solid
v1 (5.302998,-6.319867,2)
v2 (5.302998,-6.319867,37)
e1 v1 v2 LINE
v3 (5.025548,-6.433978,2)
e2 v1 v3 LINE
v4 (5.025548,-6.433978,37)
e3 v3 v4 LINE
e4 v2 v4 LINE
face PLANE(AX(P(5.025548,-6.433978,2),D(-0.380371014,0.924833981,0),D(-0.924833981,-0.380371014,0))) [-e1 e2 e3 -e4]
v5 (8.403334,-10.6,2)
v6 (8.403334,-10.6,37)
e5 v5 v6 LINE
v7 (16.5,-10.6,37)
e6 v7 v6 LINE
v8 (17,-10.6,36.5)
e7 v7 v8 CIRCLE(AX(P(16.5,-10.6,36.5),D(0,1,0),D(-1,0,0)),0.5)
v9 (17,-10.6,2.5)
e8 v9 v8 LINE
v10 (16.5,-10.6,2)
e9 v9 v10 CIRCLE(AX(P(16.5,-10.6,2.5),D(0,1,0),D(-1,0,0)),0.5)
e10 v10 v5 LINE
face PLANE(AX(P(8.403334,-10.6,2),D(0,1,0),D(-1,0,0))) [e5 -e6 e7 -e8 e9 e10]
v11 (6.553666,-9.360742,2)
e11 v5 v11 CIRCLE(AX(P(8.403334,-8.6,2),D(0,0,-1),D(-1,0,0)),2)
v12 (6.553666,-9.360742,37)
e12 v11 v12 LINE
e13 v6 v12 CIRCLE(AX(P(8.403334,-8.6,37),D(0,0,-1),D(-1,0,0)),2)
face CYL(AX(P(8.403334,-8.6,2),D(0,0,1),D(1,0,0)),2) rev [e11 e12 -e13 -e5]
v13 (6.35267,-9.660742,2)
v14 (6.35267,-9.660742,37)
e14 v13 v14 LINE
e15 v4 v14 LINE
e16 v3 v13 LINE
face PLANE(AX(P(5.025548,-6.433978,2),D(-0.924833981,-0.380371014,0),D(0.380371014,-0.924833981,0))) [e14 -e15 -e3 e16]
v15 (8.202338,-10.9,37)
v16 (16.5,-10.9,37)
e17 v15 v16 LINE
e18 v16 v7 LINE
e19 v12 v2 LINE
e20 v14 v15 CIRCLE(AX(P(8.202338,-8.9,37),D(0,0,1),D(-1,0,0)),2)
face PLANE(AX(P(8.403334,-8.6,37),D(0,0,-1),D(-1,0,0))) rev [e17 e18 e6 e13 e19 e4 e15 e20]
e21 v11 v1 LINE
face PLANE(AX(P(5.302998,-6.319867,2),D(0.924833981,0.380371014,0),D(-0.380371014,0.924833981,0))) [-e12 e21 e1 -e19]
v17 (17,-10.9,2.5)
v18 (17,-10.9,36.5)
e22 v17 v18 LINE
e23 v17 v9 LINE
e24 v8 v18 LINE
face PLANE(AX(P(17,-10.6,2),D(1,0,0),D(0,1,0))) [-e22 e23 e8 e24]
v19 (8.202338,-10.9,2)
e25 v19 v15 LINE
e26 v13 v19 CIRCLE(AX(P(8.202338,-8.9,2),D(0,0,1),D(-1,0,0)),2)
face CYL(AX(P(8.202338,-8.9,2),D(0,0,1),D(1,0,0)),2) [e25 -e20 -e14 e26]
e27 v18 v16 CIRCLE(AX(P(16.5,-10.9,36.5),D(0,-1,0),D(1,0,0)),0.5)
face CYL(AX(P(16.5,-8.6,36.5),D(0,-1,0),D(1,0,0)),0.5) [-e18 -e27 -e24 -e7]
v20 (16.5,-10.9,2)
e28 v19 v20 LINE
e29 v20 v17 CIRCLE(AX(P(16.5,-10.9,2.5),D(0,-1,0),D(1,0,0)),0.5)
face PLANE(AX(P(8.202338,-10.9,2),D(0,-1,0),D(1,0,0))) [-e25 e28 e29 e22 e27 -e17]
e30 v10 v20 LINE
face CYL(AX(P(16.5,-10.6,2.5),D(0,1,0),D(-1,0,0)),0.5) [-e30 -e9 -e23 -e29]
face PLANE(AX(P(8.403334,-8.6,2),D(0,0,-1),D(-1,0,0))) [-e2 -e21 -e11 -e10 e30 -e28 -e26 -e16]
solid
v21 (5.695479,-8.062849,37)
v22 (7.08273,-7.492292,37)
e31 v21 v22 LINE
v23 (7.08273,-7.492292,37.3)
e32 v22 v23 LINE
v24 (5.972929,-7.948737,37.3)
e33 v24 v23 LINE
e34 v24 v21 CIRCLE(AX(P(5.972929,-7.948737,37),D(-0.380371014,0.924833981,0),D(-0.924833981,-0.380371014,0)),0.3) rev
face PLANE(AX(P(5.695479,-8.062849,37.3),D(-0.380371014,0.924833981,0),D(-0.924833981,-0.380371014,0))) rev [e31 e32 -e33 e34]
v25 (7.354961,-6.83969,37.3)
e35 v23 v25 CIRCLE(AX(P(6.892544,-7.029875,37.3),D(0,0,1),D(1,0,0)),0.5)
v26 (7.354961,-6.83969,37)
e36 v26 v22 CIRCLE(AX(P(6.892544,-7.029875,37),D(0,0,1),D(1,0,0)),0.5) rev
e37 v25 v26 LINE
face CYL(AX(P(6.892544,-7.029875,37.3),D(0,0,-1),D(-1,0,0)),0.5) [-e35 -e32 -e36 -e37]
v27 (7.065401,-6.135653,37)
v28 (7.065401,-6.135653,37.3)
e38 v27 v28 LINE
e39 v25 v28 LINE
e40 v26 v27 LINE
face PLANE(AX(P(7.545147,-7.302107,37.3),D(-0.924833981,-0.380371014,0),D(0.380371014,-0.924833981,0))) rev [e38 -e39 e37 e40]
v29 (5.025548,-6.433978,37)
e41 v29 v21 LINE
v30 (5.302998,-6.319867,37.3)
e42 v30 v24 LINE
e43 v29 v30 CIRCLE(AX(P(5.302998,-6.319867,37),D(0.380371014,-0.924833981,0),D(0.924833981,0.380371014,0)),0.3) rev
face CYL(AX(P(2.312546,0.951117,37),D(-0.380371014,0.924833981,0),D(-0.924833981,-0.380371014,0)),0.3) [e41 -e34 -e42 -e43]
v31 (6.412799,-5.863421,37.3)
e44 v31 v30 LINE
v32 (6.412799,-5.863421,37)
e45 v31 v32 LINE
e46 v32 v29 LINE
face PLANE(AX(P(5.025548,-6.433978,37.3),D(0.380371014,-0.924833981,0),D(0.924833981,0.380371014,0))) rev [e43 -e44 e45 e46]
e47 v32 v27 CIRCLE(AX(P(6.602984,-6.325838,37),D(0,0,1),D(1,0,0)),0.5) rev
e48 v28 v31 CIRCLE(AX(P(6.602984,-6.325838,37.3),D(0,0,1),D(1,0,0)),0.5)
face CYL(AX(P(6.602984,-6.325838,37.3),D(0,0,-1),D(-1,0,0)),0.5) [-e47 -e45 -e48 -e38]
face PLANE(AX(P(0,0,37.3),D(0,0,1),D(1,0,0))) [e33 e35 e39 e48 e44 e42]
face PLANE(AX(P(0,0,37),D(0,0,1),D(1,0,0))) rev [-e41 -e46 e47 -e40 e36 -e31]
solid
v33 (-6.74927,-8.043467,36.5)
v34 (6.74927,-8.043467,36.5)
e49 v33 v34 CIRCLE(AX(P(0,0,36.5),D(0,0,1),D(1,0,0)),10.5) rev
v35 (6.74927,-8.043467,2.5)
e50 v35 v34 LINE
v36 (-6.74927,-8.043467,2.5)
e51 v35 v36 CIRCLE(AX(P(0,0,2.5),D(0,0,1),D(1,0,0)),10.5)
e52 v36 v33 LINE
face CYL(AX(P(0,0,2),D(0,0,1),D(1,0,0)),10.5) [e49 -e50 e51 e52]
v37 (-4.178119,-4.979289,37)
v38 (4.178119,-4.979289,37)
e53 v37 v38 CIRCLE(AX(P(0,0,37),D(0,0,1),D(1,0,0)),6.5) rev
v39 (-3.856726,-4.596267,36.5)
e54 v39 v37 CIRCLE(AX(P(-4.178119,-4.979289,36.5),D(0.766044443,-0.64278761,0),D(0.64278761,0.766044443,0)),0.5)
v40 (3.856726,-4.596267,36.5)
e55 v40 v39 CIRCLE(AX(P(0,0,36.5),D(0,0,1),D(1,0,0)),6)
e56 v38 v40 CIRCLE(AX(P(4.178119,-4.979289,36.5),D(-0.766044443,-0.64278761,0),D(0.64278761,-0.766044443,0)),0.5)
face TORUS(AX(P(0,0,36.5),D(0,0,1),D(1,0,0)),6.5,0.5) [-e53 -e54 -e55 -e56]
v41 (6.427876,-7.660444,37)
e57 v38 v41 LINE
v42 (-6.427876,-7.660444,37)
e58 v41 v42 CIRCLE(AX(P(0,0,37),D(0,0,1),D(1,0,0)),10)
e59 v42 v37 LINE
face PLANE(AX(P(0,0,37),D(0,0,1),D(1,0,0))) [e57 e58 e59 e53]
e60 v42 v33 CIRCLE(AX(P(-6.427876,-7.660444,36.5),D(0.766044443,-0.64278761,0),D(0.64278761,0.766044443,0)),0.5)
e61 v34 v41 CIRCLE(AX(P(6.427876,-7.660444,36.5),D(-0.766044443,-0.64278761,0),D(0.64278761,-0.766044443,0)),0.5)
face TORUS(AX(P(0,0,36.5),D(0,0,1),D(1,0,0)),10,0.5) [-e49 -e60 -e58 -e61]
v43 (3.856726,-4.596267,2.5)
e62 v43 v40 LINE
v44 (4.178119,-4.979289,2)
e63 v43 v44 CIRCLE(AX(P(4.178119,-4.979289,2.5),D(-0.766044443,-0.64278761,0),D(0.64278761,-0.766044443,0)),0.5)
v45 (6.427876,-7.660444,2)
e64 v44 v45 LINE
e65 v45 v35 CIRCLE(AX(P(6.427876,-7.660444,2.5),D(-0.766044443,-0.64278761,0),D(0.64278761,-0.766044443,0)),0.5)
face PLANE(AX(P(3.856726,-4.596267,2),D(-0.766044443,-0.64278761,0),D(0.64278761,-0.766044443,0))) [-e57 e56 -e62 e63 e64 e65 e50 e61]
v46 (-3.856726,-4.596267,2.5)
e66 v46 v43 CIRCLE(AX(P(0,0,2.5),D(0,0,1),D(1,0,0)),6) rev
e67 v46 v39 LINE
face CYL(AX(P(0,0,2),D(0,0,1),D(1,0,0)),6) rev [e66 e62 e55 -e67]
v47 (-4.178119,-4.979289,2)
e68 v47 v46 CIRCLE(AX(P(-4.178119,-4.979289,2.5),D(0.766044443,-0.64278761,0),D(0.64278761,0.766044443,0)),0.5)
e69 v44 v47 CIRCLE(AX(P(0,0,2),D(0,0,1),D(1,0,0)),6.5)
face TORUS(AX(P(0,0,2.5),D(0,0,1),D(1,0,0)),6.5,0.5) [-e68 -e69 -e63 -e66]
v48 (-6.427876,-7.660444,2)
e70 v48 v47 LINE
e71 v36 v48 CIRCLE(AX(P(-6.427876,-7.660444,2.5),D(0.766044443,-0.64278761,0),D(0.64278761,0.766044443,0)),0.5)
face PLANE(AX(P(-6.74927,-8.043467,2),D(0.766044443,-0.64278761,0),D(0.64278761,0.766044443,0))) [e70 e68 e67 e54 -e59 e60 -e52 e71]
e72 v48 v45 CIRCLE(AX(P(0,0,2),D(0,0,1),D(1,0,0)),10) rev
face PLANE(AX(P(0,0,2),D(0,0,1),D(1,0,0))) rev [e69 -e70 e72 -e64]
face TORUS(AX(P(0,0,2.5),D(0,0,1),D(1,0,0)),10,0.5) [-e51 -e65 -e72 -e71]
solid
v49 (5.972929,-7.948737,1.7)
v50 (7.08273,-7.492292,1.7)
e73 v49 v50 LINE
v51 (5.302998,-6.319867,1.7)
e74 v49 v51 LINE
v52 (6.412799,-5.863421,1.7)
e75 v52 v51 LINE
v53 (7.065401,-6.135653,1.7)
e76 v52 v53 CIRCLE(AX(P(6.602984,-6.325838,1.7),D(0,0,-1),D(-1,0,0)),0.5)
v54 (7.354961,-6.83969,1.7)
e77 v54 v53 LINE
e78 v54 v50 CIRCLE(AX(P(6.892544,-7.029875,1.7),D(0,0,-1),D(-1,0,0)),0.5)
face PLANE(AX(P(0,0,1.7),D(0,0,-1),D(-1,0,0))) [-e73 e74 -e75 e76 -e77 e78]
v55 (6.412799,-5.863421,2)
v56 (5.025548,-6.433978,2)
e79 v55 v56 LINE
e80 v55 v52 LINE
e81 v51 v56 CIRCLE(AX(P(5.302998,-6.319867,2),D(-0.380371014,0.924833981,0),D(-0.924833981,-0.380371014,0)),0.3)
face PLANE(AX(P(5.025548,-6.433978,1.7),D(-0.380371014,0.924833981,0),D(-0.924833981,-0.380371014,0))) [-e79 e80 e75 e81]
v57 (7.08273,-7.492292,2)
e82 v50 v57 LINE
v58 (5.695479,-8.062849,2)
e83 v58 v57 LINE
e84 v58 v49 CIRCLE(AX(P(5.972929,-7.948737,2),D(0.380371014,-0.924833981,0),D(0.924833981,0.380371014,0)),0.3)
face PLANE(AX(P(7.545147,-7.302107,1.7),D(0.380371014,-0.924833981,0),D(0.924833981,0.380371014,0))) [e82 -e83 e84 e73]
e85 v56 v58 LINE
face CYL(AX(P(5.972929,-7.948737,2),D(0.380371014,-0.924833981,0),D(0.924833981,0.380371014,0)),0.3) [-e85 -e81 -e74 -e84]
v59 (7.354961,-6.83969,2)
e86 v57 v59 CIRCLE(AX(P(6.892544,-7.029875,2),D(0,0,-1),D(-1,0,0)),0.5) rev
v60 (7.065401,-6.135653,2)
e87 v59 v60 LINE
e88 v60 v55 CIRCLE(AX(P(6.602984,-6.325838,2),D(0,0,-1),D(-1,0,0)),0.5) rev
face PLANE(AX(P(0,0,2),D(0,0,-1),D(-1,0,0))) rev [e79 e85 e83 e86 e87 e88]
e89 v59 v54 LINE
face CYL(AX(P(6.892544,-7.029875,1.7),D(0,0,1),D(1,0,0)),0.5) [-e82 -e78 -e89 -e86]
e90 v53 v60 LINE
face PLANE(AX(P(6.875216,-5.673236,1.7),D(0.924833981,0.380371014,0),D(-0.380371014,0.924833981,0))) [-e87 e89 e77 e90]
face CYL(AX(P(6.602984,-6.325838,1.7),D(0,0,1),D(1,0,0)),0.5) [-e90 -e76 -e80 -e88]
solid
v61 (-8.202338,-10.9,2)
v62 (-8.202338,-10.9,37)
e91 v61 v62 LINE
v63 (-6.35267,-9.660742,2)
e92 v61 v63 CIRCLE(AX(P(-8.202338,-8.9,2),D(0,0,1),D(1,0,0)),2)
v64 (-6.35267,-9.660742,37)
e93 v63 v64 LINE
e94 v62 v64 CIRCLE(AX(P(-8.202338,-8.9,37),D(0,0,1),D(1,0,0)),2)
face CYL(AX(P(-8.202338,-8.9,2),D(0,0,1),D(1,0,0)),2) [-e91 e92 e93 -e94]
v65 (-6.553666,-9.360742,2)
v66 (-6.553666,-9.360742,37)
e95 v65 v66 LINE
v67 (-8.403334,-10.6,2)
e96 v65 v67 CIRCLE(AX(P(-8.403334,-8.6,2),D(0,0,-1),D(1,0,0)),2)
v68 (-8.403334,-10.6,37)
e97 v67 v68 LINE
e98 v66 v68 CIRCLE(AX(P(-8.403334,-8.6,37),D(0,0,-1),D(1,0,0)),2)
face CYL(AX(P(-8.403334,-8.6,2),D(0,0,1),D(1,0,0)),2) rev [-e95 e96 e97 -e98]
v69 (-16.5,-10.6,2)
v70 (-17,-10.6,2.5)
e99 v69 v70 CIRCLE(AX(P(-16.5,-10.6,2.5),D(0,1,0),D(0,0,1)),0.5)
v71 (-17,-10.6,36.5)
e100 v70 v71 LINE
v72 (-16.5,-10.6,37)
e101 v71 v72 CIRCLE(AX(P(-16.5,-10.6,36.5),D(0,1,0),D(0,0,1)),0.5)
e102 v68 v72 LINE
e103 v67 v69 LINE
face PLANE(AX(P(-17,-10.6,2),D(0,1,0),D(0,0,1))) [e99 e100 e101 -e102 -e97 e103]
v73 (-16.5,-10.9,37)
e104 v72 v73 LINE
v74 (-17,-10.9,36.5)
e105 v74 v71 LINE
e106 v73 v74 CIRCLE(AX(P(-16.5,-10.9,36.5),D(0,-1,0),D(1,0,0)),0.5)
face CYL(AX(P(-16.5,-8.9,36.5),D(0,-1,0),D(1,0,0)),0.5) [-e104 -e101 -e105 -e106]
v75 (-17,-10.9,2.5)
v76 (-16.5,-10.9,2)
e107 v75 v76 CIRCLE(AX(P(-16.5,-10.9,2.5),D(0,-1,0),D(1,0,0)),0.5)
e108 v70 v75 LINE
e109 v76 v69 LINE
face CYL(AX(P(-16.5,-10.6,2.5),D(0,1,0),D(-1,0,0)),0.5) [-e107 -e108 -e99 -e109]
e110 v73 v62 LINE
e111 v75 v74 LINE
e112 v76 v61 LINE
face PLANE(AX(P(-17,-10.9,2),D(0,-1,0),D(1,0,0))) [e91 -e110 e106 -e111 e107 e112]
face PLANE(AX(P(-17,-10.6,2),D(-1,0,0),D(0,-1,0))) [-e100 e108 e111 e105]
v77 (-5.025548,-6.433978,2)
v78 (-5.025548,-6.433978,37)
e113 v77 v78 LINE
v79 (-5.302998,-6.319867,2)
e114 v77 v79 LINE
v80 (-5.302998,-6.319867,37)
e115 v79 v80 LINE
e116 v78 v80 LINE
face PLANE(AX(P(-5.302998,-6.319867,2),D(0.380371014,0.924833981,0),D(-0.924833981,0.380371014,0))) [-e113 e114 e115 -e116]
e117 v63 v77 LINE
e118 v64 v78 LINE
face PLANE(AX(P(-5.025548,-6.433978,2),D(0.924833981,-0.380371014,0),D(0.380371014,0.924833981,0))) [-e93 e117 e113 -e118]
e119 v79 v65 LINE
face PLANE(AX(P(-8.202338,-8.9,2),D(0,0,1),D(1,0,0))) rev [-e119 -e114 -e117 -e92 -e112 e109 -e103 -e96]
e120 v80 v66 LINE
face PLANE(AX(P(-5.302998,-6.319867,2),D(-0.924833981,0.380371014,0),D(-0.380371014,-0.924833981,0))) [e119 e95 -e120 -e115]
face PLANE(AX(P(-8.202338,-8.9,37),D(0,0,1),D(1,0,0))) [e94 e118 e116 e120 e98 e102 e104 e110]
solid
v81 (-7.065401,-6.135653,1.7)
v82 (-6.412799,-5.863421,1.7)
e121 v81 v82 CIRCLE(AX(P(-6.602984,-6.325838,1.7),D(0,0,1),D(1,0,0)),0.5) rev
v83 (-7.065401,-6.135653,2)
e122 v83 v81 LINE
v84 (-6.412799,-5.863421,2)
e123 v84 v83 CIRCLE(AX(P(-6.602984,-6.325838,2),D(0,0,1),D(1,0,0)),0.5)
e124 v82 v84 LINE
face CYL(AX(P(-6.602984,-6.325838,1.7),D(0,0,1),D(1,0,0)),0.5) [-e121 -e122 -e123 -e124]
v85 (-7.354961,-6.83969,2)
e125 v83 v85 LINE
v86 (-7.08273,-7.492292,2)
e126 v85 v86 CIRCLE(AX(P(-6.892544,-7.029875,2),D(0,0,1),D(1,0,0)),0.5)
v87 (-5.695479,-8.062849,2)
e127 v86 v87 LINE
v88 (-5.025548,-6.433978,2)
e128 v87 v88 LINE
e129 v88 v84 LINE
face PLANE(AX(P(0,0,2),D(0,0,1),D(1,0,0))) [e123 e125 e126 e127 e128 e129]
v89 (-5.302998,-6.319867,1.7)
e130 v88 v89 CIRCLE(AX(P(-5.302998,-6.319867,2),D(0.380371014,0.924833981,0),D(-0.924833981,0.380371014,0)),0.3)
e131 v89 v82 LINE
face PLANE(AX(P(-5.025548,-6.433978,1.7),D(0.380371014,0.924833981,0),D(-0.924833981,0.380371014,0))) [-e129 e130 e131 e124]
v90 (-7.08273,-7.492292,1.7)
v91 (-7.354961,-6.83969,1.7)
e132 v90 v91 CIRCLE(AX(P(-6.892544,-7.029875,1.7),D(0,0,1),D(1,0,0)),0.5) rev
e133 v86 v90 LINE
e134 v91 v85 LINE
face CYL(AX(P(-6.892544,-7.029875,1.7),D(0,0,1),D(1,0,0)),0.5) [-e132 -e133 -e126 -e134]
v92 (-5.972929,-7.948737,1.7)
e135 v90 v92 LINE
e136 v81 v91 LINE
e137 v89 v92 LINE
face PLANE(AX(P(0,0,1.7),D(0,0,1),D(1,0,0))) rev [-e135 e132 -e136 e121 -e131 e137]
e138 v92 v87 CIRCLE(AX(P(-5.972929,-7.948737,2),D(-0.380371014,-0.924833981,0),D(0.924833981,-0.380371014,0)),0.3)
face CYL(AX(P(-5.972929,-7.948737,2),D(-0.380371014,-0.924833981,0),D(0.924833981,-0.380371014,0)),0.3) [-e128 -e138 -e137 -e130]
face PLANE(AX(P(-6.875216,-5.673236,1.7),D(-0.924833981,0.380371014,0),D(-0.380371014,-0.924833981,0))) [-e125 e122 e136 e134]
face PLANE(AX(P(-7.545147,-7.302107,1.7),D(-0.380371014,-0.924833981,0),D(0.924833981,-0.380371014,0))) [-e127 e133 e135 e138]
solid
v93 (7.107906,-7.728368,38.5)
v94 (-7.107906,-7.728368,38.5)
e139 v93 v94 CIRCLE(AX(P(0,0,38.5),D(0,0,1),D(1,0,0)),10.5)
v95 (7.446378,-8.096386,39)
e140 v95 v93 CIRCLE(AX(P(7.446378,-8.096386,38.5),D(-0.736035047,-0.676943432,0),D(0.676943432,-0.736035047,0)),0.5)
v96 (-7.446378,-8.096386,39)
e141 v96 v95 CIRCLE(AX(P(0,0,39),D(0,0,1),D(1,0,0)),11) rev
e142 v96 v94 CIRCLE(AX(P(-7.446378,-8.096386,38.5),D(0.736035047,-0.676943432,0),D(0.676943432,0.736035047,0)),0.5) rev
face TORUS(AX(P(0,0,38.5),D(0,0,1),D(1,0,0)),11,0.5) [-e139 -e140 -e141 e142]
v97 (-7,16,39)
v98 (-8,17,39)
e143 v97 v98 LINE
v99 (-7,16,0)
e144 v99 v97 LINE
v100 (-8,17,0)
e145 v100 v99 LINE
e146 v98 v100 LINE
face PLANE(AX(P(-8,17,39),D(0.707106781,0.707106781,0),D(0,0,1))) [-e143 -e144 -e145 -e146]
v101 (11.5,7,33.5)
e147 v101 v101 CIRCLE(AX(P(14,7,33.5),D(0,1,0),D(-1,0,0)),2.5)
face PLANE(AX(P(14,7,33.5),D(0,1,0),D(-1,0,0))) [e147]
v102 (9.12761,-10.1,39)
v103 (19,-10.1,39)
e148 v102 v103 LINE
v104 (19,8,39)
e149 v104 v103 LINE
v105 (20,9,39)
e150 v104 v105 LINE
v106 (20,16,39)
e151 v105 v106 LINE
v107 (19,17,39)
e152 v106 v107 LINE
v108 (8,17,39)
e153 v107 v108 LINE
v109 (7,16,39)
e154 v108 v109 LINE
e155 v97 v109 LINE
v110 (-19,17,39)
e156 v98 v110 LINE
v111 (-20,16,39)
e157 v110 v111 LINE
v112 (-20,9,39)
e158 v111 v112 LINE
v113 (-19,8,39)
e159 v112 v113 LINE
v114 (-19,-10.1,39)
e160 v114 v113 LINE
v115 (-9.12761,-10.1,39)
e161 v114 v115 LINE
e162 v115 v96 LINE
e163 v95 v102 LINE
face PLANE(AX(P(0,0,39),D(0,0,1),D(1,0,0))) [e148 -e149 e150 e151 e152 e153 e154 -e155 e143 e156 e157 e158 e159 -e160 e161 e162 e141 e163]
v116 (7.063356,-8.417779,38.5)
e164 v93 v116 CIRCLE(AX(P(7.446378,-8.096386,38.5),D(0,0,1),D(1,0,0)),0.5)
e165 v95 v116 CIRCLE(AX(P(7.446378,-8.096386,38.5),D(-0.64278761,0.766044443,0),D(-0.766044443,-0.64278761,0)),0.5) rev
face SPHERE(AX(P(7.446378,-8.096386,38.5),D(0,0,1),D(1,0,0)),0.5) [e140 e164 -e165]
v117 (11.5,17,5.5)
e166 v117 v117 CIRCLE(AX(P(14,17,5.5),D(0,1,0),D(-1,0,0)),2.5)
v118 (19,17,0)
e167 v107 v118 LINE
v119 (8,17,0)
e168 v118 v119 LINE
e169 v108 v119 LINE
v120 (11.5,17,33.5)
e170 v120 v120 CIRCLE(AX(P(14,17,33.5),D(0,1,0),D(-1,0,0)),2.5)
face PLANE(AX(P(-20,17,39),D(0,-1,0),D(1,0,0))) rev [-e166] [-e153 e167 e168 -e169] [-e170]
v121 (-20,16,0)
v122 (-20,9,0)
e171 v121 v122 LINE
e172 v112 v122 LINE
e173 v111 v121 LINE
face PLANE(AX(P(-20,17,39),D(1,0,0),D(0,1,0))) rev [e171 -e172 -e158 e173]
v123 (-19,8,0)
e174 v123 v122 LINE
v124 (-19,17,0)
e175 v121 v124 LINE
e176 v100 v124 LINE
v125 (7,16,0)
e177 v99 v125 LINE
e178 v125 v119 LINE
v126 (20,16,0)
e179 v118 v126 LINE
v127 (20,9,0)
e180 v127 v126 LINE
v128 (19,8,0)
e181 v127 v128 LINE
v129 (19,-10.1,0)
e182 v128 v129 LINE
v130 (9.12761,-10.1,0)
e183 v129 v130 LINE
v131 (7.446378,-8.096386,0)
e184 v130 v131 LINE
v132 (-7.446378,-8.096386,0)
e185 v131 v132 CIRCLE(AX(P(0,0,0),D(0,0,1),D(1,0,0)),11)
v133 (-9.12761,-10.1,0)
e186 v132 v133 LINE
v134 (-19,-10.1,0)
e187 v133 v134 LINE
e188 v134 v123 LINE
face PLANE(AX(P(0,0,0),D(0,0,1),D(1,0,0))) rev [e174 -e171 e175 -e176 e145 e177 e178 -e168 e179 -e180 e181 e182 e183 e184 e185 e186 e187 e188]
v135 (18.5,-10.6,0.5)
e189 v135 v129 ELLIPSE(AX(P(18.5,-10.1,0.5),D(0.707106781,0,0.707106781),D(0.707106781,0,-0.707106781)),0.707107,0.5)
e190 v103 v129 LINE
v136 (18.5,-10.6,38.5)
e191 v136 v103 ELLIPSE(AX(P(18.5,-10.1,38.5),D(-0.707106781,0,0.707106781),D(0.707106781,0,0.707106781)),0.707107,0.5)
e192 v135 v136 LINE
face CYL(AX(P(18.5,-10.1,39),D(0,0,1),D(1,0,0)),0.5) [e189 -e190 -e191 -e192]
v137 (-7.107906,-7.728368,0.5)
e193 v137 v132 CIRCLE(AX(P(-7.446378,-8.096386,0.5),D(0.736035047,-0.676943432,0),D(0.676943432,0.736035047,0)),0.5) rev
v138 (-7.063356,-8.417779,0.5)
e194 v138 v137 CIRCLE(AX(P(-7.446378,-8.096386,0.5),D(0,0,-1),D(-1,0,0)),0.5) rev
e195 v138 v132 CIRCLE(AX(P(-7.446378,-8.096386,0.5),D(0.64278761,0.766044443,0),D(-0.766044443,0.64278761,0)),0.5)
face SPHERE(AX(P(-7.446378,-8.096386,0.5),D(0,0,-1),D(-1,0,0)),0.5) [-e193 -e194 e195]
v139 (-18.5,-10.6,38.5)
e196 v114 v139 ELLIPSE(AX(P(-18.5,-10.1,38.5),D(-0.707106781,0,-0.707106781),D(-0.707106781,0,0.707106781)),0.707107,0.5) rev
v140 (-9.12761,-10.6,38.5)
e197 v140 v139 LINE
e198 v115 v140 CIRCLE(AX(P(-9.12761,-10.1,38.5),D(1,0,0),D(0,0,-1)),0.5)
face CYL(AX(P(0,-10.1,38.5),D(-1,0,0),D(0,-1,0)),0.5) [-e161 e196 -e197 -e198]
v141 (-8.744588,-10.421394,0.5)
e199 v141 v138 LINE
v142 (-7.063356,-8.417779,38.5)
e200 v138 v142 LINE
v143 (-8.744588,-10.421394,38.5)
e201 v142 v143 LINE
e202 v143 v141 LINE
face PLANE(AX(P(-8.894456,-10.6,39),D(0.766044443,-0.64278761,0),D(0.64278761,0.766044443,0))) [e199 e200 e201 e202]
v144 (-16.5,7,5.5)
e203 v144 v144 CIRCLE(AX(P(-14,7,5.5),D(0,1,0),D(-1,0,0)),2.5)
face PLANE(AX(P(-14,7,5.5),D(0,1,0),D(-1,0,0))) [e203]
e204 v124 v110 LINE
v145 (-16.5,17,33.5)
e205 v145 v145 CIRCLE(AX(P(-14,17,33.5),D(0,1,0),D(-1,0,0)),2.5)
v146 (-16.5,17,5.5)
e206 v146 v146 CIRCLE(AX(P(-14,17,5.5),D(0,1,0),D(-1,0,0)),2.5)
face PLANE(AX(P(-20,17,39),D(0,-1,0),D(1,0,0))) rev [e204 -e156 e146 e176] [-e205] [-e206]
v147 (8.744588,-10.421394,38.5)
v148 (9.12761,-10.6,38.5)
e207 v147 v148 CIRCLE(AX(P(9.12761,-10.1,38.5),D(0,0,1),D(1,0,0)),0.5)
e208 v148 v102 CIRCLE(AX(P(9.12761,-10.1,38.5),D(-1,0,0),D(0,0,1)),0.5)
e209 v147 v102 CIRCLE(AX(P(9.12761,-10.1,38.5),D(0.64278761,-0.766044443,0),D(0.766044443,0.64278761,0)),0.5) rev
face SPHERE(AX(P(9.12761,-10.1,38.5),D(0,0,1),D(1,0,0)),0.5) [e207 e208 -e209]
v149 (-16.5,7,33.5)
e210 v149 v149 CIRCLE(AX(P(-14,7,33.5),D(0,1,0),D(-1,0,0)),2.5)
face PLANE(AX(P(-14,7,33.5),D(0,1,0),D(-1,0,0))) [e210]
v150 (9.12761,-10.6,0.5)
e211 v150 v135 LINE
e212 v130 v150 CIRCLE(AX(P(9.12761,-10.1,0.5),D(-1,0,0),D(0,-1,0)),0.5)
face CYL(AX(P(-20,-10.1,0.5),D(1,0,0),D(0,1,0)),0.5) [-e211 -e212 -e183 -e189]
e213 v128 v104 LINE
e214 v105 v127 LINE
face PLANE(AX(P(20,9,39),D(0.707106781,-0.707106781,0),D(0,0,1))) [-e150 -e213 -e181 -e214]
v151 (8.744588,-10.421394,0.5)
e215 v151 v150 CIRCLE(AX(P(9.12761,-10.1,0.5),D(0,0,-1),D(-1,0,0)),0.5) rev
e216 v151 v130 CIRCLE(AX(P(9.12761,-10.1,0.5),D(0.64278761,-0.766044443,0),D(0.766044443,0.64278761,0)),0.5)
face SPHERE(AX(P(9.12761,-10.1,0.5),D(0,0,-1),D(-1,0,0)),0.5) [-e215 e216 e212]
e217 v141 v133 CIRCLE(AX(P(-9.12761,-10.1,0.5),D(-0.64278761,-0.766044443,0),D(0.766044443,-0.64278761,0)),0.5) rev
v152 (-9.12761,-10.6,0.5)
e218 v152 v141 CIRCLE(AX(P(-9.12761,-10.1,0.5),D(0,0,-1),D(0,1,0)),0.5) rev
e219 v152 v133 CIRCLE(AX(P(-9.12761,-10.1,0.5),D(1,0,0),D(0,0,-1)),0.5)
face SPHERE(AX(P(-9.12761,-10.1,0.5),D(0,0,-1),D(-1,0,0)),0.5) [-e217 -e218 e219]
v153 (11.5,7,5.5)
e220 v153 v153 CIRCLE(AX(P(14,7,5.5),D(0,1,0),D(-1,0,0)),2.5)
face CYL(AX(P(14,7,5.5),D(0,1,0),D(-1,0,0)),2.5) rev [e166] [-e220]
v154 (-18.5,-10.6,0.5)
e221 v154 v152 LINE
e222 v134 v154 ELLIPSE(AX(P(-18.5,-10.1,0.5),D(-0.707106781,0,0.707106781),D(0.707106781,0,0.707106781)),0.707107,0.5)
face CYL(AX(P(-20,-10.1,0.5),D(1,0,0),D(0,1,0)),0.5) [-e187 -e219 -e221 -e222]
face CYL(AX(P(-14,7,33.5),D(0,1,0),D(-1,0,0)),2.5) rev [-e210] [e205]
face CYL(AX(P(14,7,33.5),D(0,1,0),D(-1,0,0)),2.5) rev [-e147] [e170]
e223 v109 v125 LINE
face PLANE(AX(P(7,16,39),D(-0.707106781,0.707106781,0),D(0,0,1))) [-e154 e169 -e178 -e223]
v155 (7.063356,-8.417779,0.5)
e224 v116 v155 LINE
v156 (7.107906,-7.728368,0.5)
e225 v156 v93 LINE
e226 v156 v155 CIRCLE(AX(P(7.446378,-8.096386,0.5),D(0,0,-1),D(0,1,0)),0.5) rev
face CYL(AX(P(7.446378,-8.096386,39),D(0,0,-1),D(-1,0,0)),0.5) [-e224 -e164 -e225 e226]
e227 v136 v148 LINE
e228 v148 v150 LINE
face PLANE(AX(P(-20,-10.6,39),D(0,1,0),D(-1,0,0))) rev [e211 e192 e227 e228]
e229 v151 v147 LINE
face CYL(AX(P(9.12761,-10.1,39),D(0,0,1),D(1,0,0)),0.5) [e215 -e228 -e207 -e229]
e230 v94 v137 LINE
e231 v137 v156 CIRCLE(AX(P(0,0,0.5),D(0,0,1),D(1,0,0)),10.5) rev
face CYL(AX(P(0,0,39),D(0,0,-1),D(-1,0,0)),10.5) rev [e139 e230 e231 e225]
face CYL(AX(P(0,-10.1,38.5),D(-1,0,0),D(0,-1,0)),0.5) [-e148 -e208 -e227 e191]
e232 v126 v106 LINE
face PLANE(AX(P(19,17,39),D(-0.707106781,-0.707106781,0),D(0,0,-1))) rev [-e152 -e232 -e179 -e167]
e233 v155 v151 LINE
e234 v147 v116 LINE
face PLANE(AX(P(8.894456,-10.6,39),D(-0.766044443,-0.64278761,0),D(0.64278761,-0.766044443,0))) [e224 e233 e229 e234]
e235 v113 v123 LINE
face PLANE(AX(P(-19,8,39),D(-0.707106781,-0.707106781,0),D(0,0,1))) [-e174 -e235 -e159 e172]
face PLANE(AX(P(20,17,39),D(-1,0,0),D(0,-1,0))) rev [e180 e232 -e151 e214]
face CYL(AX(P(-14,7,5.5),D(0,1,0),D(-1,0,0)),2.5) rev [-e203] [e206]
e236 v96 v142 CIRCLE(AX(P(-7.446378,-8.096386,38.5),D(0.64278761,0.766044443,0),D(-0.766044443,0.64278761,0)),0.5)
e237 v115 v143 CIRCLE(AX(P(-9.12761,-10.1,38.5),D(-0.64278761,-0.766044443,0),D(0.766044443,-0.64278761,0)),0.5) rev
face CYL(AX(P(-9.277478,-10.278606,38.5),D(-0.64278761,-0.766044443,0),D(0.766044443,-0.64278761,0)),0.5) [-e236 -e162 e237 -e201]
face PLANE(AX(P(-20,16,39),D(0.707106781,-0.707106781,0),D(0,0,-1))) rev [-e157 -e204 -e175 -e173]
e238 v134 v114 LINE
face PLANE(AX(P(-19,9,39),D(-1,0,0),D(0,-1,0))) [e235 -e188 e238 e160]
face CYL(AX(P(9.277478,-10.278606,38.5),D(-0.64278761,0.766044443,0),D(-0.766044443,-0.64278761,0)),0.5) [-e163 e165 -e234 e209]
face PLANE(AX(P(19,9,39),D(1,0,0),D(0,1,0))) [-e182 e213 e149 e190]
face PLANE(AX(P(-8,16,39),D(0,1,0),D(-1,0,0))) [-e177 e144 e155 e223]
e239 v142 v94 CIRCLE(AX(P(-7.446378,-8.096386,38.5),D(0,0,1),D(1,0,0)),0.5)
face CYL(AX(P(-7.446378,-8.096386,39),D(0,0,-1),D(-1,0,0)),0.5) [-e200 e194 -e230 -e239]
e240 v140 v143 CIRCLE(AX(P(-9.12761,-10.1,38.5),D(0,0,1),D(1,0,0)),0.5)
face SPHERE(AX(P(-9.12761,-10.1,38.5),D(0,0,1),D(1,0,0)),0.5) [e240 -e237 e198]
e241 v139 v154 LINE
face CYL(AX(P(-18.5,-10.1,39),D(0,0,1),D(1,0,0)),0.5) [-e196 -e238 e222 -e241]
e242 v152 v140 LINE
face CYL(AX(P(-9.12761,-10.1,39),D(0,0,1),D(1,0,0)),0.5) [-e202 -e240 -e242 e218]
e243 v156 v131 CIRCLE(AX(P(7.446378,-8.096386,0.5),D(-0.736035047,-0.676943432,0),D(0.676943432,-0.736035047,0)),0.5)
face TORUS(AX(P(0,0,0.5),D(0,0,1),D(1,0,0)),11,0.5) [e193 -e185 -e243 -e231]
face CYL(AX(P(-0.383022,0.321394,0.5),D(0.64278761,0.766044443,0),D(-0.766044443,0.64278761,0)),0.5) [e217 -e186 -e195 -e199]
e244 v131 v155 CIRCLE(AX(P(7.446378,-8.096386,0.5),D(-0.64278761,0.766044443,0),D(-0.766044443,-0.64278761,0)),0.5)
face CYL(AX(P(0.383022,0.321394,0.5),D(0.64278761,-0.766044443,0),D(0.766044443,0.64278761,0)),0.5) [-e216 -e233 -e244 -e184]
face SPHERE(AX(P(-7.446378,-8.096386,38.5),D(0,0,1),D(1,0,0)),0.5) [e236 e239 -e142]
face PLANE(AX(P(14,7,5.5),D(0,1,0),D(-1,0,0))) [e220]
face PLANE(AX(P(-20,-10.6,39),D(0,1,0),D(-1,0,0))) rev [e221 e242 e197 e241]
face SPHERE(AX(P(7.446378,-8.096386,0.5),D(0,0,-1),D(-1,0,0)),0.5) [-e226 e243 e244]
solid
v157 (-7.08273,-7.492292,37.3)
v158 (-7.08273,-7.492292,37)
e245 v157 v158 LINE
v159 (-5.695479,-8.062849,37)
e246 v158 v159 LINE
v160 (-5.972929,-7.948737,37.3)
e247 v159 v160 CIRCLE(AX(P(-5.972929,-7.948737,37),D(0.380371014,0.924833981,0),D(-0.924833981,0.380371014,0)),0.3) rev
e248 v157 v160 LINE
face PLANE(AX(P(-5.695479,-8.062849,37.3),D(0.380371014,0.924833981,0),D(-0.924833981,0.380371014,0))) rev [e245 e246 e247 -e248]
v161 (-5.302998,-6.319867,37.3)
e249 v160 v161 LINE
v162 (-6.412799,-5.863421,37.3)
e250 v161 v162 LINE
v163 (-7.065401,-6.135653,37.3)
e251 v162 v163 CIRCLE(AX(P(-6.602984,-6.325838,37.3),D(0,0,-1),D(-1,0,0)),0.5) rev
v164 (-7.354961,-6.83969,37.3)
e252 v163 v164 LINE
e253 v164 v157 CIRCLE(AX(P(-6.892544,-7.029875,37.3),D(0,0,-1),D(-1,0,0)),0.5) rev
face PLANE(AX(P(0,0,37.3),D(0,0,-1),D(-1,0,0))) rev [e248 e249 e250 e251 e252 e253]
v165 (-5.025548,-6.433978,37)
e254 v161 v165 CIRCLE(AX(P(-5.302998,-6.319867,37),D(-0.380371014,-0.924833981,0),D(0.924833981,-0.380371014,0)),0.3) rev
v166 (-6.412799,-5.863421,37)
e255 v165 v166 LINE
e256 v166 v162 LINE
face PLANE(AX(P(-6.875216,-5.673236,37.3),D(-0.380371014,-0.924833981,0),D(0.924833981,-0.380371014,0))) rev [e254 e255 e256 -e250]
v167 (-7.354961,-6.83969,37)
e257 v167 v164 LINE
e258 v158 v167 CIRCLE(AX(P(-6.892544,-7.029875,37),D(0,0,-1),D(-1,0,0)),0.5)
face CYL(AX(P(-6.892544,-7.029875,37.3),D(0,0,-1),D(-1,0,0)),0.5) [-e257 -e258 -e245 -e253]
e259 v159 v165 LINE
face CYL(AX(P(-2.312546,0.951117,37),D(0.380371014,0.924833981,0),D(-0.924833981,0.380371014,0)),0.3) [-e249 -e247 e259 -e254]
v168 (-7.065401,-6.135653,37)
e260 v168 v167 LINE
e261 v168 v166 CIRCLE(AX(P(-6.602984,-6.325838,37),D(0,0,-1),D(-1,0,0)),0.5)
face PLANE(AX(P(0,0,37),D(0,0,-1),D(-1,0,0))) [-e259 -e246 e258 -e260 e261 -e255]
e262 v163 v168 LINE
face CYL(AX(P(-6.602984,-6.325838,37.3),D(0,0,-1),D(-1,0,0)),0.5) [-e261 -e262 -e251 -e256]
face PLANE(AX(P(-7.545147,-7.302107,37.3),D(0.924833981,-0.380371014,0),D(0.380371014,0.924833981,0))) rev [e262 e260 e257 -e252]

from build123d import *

# Parameters (mm, degrees)
SKETCH2_W                  = 40
SKETCH2_H                  = 27.6
BOSS_EXTRUDE1_DEPTH        = 39
SKETCH3_W                  = 1
SKETCH3_H                  = 19.6
SKETCH3_W_2                = 16
SKETCH3_H_2                = 1
CUT_EXTRUDE1_DEPTH         = 39
CUT_EXTRUDE2_DEPTH         = 39
FILLET1_R                  = 0.5
CHAMFER1_SIZE              = 1
SKETCH7_R                  = 2.5
CUT_EXTRUDE4_DEPTH         = 10
BOSS_EXTRUDE2_DEPTH        = 17.5
BOSS_EXTRUDE2_DEPTH_BACK   = 17.5
FILLET2_R                  = 0.5
BOSS_EXTRUDE4_DEPTH        = 17.5
BOSS_EXTRUDE4_DEPTH_BACK   = 17.5
BOSS_EXTRUDE4_2_DEPTH      = 17.5
BOSS_EXTRUDE4_2_DEPTH_BACK = 17.5
FILLET5_R                  = 0.5
FILLET4_R                  = 0.5
BOSS_EXTRUDE9_DEPTH        = 0.3
BOSS_EXTRUDE9_2_DEPTH      = 0.3
FILLET6_R                  = 0.5
FILLET7_R                  = 0.5
FILLET8_R                  = 0.3
FILLET9_R                  = 0.3
BOSS_EXTRUDE13_DEPTH       = 0.3
BOSS_EXTRUDE13_2_DEPTH     = 0.3
FILLET10_R                 = 0.5
FILLET11_R                 = 0.5
FILLET12_R                 = 0.3
FILLET13_R                 = 0.3


with BuildPart() as part:
    # Sketch2 → Boss-Extrude1 (new body)
    with BuildSketch(Plane.XY):
        with Locations((0, 3.2)):
            Rectangle(SKETCH2_W, SKETCH2_H)
    extrude(amount=BOSS_EXTRUDE1_DEPTH)

    # Sketch3 → Cut-Extrude1 (cut)
    with BuildSketch(Plane.XY):
        with Locations((-19.5, -0.8)):
            Rectangle(SKETCH3_W, SKETCH3_H)
        with Locations((19.5, -0.8)):
            Rectangle(SKETCH3_W, SKETCH3_H)
        with Locations((0, 16.5)):
            Rectangle(SKETCH3_W_2, SKETCH3_H_2)
    extrude(amount=CUT_EXTRUDE1_DEPTH, mode=Mode.SUBTRACT)

    # Sketch4 → Cut-Extrude2 (cut)
    with BuildSketch(Plane.XY):
        with BuildLine():
            Line((-8.89445609, -10.6), (-6.749269902, -8.043466653))
            ThreePointArc((-6.749269902, -8.043466653), (0, 10.5), (6.749269902, -8.043466653))
            Line((6.749269902, -8.043466653), (8.89445609, -10.6))
            Line((8.89445609, -10.6), (-8.89445609, -10.6))
        make_face()
    extrude(amount=CUT_EXTRUDE2_DEPTH, mode=Mode.SUBTRACT)

    # Fillet1
    fillet1_edges = [part.edges().sort_by_distance(p)[0] for p in [
        (-13.947228045, -10.6, 0),
        (-13.947228045, -10.6, 39),
        (-19, -10.6, 19.5),
        (19, -10.6, 19.5),
        (13.947228045, -10.6, 0),
        (13.947228045, -10.6, 39),
        (0, 10.5, 0),
        (6.749269902, -8.043466653, 19.5),
        (-7.821862996, -9.321733326, 0),
        (-6.749269902, -8.043466653, 19.5),
        (-8.89445609, -10.6, 19.5),
        (7.821862996, -9.321733326, 0),
        (8.89445609, -10.6, 19.5),
        (0, 10.5, 39),
        (-7.821862996, -9.321733326, 39),
        (7.821862996, -9.321733326, 39),
    ]]
    fillet(fillet1_edges, radius=FILLET1_R)

    # Chamfer1
    chamfer1_edges = [part.edges().sort_by_distance(p)[0] for p in [
        (8, 16, 19.5),
        (-8, 16, 19.5),
        (-19, 9, 19.5),
        (19, 9, 19.5),
        (-20, 17, 19.5),
        (20, 17, 19.5),
    ]]
    chamfer(chamfer1_edges, length=CHAMFER1_SIZE - 0.0001)  # a hair under: the kernel refuses the full size

    # Sketch7 → Cut-Extrude4 (cut)
    with BuildSketch(Plane(origin=(0, 17, 0), x_dir=(1, 0, 0), z_dir=(0, 1, 0))):
        with Locations(Location((-14, -5.5, 0), (0, 0, 180))):
            Circle(SKETCH7_R)
        with Locations(Location((14, -5.5, 0), (0, 0, 180))):
            Circle(SKETCH7_R)
        with Locations(Location((-14, -33.5, 0), (0, 0, 180))):
            Circle(SKETCH7_R)
        with Locations(Location((14, -33.5, 0), (0, 0, 180))):
            Circle(SKETCH7_R)
    extrude(amount=-CUT_EXTRUDE4_DEPTH, mode=Mode.SUBTRACT)


with BuildPart() as body_2:
    # Sketch8 → Boss-Extrude2 (new, two sides: drawn at the far end of the back side and taken through both)
    with BuildSketch(Plane.XY.offset(19.5).offset(-BOSS_EXTRUDE2_DEPTH_BACK)):
        with BuildLine():
            Line((-6.749269902, -8.043466653), (-3.856725658, -4.596266659))
            ThreePointArc((-3.856725658, -4.596266659), (0, 6), (3.856725658, -4.596266659))
            Line((3.856725658, -4.596266659), (6.749269902, -8.043466653))
            ThreePointArc((6.749269902, -8.043466653), (0, 10.5), (-6.749269902, -8.043466653))
        make_face()
    extrude(amount=BOSS_EXTRUDE2_DEPTH + BOSS_EXTRUDE2_DEPTH_BACK)

    # Fillet2
    fillet2_edges = [body_2.edges().sort_by_distance(p)[0] for p in [
        (0, 10.5, 37),
        (0, 6, 2),
        (0, 6, 37),
        (0, 10.5, 2),
    ]]
    fillet(fillet2_edges, radius=FILLET2_R)


with BuildPart() as body_3:
    # Sketch9 → Boss-Extrude4 (new, two sides: drawn at the far end of the back side and taken through both)
    with BuildSketch(Plane.XY.offset(19.5).offset(-BOSS_EXTRUDE4_DEPTH_BACK)):
        with BuildLine():
            Line((-17, -10.6), (-8.403334373, -10.6))
            ThreePointArc((-8.403334373, -10.6), (-7.290114731, -10.261548082), (-6.553666412, -9.360742028))
            Line((-6.553666412, -9.360742028), (-5.30299778, -6.319866656))
            Line((-5.30299778, -6.319866656), (-5.025547586, -6.43397796))
            Line((-5.025547586, -6.43397796), (-6.352669585, -9.660742028))
            ThreePointArc((-6.352669585, -9.660742028), (-7.089117904, -10.561548082), (-8.202337546, -10.9))
            Line((-8.202337546, -10.9), (-17, -10.9))
            Line((-17, -10.9), (-17, -10.6))
        make_face()
    extrude(amount=BOSS_EXTRUDE4_DEPTH + BOSS_EXTRUDE4_DEPTH_BACK)

    # Fillet4
    fillet4_edges = [body_3.edges().sort_by_distance(p)[0] for p in [
        (-17, -10.75, 37),
        (-17, -10.75, 2),
    ]]
    fillet(fillet4_edges, radius=FILLET4_R)


with BuildPart() as body_4:
    # Sketch9 → Boss-Extrude4 2 (new, two sides: drawn at the far end of the back side and taken through both)
    with BuildSketch(Plane.XY.offset(19.5).offset(-BOSS_EXTRUDE4_2_DEPTH_BACK)):
        with BuildLine():
            Line((17, -10.6), (17, -10.9))
            Line((17, -10.9), (8.202337546, -10.9))
            ThreePointArc((8.202337546, -10.9), (7.089117904, -10.561548082), (6.352669585, -9.660742028))
            Line((6.352669585, -9.660742028), (5.025547586, -6.43397796))
            Line((5.025547586, -6.43397796), (5.30299778, -6.319866656))
            Line((5.30299778, -6.319866656), (6.553666412, -9.360742028))
            ThreePointArc((6.553666412, -9.360742028), (7.290114731, -10.261548082), (8.403334373, -10.6))
            Line((8.403334373, -10.6), (17, -10.6))
        make_face()
    extrude(amount=BOSS_EXTRUDE4_2_DEPTH + BOSS_EXTRUDE4_2_DEPTH_BACK)

    # Fillet5
    fillet5_edges = [body_4.edges().sort_by_distance(p)[0] for p in [
        (17, -10.75, 2),
        (17, -10.75, 37),
    ]]
    fillet(fillet5_edges, radius=FILLET5_R)


with BuildPart() as body_5:
    # Sketch11 → Boss-Extrude9 (new body)
    with BuildSketch(Plane.XY.offset(2)):
        Polygon((-5.025547586, -6.43397796), (-6.875215547, -5.673235932), (-7.54514678, -7.30210655), (-5.695478819, -8.062848578), align=None)
    extrude(amount=-BOSS_EXTRUDE9_DEPTH)

    # Fillet7
    fillet7_edges = [body_5.edges().sort_by_distance(p)[0] for p in [
        (-7.54514678, -7.30210655, 1.85),
        (-6.875215547, -5.673235932, 1.85),
    ]]
    fillet(fillet7_edges, radius=FILLET7_R)

    # Fillet9
    fillet9_edges = [body_5.edges().sort_by_distance(p)[0] for p in [
        (-5.360513202, -7.248413269, 1.7),
    ]]
    fillet(fillet9_edges, radius=FILLET9_R - 0.0001)  # a hair under: the kernel refuses the full size


with BuildPart() as body_6:
    # Sketch11 → Boss-Extrude9 2 (new body)
    with BuildSketch(Plane.XY.offset(2)):
        Polygon((5.025547586, -6.43397796), (6.875215547, -5.673235932), (7.54514678, -7.30210655), (5.695478819, -8.062848578), align=None)
    extrude(amount=-BOSS_EXTRUDE9_2_DEPTH)

    # Fillet6
    fillet6_edges = [body_6.edges().sort_by_distance(p)[0] for p in [
        (6.875215547, -5.673235932, 1.85),
        (7.54514678, -7.30210655, 1.85),
    ]]
    fillet(fillet6_edges, radius=FILLET6_R)

    # Fillet8
    fillet8_edges = [body_6.edges().sort_by_distance(p)[0] for p in [
        (5.360513202, -7.248413269, 1.7),
    ]]
    fillet(fillet8_edges, radius=FILLET8_R - 0.0001)  # a hair under: the kernel refuses the full size


with BuildPart() as body_7:
    # Sketch13 → Boss-Extrude13 (new body)
    with BuildSketch(Plane.XY.offset(37)):
        Polygon((-5.025547586, -6.43397796), (-5.695478819, -8.062848578), (-7.54514678, -7.30210655), (-6.875215547, -5.673235932), align=None)
    extrude(amount=BOSS_EXTRUDE13_DEPTH)

    # Fillet11
    fillet11_edges = [body_7.edges().sort_by_distance(p)[0] for p in [
        (-7.54514678, -7.30210655, 37.15),
        (-6.875215547, -5.673235932, 37.15),
    ]]
    fillet(fillet11_edges, radius=FILLET11_R)

    # Fillet12
    fillet12_edges = [body_7.edges().sort_by_distance(p)[0] for p in [
        (-5.360513202, -7.248413269, 37.3),
    ]]
    fillet(fillet12_edges, radius=FILLET12_R - 0.0001)  # a hair under: the kernel refuses the full size


with BuildPart() as body_8:
    # Sketch13 → Boss-Extrude13 2 (new body)
    with BuildSketch(Plane.XY.offset(37)):
        Polygon((5.025547586, -6.43397796), (5.695478819, -8.062848578), (7.54514678, -7.30210655), (6.875215547, -5.673235932), align=None)
    extrude(amount=BOSS_EXTRUDE13_2_DEPTH)

    # Fillet10
    fillet10_edges = [body_8.edges().sort_by_distance(p)[0] for p in [
        (6.875215547, -5.673235932, 37.15),
        (7.54514678, -7.30210655, 37.15),
    ]]
    fillet(fillet10_edges, radius=FILLET10_R)

    # Fillet13
    fillet13_edges = [body_8.edges().sort_by_distance(p)[0] for p in [
        (5.360513202, -7.248413269, 37.3),
    ]]
    fillet(fillet13_edges, radius=FILLET13_R - 0.0001)  # a hair under: the kernel refuses the full size


solid = Compound([part.part, body_2.part, body_3.part, body_4.part, body_5.part, body_6.part, body_7.part, body_8.part])
